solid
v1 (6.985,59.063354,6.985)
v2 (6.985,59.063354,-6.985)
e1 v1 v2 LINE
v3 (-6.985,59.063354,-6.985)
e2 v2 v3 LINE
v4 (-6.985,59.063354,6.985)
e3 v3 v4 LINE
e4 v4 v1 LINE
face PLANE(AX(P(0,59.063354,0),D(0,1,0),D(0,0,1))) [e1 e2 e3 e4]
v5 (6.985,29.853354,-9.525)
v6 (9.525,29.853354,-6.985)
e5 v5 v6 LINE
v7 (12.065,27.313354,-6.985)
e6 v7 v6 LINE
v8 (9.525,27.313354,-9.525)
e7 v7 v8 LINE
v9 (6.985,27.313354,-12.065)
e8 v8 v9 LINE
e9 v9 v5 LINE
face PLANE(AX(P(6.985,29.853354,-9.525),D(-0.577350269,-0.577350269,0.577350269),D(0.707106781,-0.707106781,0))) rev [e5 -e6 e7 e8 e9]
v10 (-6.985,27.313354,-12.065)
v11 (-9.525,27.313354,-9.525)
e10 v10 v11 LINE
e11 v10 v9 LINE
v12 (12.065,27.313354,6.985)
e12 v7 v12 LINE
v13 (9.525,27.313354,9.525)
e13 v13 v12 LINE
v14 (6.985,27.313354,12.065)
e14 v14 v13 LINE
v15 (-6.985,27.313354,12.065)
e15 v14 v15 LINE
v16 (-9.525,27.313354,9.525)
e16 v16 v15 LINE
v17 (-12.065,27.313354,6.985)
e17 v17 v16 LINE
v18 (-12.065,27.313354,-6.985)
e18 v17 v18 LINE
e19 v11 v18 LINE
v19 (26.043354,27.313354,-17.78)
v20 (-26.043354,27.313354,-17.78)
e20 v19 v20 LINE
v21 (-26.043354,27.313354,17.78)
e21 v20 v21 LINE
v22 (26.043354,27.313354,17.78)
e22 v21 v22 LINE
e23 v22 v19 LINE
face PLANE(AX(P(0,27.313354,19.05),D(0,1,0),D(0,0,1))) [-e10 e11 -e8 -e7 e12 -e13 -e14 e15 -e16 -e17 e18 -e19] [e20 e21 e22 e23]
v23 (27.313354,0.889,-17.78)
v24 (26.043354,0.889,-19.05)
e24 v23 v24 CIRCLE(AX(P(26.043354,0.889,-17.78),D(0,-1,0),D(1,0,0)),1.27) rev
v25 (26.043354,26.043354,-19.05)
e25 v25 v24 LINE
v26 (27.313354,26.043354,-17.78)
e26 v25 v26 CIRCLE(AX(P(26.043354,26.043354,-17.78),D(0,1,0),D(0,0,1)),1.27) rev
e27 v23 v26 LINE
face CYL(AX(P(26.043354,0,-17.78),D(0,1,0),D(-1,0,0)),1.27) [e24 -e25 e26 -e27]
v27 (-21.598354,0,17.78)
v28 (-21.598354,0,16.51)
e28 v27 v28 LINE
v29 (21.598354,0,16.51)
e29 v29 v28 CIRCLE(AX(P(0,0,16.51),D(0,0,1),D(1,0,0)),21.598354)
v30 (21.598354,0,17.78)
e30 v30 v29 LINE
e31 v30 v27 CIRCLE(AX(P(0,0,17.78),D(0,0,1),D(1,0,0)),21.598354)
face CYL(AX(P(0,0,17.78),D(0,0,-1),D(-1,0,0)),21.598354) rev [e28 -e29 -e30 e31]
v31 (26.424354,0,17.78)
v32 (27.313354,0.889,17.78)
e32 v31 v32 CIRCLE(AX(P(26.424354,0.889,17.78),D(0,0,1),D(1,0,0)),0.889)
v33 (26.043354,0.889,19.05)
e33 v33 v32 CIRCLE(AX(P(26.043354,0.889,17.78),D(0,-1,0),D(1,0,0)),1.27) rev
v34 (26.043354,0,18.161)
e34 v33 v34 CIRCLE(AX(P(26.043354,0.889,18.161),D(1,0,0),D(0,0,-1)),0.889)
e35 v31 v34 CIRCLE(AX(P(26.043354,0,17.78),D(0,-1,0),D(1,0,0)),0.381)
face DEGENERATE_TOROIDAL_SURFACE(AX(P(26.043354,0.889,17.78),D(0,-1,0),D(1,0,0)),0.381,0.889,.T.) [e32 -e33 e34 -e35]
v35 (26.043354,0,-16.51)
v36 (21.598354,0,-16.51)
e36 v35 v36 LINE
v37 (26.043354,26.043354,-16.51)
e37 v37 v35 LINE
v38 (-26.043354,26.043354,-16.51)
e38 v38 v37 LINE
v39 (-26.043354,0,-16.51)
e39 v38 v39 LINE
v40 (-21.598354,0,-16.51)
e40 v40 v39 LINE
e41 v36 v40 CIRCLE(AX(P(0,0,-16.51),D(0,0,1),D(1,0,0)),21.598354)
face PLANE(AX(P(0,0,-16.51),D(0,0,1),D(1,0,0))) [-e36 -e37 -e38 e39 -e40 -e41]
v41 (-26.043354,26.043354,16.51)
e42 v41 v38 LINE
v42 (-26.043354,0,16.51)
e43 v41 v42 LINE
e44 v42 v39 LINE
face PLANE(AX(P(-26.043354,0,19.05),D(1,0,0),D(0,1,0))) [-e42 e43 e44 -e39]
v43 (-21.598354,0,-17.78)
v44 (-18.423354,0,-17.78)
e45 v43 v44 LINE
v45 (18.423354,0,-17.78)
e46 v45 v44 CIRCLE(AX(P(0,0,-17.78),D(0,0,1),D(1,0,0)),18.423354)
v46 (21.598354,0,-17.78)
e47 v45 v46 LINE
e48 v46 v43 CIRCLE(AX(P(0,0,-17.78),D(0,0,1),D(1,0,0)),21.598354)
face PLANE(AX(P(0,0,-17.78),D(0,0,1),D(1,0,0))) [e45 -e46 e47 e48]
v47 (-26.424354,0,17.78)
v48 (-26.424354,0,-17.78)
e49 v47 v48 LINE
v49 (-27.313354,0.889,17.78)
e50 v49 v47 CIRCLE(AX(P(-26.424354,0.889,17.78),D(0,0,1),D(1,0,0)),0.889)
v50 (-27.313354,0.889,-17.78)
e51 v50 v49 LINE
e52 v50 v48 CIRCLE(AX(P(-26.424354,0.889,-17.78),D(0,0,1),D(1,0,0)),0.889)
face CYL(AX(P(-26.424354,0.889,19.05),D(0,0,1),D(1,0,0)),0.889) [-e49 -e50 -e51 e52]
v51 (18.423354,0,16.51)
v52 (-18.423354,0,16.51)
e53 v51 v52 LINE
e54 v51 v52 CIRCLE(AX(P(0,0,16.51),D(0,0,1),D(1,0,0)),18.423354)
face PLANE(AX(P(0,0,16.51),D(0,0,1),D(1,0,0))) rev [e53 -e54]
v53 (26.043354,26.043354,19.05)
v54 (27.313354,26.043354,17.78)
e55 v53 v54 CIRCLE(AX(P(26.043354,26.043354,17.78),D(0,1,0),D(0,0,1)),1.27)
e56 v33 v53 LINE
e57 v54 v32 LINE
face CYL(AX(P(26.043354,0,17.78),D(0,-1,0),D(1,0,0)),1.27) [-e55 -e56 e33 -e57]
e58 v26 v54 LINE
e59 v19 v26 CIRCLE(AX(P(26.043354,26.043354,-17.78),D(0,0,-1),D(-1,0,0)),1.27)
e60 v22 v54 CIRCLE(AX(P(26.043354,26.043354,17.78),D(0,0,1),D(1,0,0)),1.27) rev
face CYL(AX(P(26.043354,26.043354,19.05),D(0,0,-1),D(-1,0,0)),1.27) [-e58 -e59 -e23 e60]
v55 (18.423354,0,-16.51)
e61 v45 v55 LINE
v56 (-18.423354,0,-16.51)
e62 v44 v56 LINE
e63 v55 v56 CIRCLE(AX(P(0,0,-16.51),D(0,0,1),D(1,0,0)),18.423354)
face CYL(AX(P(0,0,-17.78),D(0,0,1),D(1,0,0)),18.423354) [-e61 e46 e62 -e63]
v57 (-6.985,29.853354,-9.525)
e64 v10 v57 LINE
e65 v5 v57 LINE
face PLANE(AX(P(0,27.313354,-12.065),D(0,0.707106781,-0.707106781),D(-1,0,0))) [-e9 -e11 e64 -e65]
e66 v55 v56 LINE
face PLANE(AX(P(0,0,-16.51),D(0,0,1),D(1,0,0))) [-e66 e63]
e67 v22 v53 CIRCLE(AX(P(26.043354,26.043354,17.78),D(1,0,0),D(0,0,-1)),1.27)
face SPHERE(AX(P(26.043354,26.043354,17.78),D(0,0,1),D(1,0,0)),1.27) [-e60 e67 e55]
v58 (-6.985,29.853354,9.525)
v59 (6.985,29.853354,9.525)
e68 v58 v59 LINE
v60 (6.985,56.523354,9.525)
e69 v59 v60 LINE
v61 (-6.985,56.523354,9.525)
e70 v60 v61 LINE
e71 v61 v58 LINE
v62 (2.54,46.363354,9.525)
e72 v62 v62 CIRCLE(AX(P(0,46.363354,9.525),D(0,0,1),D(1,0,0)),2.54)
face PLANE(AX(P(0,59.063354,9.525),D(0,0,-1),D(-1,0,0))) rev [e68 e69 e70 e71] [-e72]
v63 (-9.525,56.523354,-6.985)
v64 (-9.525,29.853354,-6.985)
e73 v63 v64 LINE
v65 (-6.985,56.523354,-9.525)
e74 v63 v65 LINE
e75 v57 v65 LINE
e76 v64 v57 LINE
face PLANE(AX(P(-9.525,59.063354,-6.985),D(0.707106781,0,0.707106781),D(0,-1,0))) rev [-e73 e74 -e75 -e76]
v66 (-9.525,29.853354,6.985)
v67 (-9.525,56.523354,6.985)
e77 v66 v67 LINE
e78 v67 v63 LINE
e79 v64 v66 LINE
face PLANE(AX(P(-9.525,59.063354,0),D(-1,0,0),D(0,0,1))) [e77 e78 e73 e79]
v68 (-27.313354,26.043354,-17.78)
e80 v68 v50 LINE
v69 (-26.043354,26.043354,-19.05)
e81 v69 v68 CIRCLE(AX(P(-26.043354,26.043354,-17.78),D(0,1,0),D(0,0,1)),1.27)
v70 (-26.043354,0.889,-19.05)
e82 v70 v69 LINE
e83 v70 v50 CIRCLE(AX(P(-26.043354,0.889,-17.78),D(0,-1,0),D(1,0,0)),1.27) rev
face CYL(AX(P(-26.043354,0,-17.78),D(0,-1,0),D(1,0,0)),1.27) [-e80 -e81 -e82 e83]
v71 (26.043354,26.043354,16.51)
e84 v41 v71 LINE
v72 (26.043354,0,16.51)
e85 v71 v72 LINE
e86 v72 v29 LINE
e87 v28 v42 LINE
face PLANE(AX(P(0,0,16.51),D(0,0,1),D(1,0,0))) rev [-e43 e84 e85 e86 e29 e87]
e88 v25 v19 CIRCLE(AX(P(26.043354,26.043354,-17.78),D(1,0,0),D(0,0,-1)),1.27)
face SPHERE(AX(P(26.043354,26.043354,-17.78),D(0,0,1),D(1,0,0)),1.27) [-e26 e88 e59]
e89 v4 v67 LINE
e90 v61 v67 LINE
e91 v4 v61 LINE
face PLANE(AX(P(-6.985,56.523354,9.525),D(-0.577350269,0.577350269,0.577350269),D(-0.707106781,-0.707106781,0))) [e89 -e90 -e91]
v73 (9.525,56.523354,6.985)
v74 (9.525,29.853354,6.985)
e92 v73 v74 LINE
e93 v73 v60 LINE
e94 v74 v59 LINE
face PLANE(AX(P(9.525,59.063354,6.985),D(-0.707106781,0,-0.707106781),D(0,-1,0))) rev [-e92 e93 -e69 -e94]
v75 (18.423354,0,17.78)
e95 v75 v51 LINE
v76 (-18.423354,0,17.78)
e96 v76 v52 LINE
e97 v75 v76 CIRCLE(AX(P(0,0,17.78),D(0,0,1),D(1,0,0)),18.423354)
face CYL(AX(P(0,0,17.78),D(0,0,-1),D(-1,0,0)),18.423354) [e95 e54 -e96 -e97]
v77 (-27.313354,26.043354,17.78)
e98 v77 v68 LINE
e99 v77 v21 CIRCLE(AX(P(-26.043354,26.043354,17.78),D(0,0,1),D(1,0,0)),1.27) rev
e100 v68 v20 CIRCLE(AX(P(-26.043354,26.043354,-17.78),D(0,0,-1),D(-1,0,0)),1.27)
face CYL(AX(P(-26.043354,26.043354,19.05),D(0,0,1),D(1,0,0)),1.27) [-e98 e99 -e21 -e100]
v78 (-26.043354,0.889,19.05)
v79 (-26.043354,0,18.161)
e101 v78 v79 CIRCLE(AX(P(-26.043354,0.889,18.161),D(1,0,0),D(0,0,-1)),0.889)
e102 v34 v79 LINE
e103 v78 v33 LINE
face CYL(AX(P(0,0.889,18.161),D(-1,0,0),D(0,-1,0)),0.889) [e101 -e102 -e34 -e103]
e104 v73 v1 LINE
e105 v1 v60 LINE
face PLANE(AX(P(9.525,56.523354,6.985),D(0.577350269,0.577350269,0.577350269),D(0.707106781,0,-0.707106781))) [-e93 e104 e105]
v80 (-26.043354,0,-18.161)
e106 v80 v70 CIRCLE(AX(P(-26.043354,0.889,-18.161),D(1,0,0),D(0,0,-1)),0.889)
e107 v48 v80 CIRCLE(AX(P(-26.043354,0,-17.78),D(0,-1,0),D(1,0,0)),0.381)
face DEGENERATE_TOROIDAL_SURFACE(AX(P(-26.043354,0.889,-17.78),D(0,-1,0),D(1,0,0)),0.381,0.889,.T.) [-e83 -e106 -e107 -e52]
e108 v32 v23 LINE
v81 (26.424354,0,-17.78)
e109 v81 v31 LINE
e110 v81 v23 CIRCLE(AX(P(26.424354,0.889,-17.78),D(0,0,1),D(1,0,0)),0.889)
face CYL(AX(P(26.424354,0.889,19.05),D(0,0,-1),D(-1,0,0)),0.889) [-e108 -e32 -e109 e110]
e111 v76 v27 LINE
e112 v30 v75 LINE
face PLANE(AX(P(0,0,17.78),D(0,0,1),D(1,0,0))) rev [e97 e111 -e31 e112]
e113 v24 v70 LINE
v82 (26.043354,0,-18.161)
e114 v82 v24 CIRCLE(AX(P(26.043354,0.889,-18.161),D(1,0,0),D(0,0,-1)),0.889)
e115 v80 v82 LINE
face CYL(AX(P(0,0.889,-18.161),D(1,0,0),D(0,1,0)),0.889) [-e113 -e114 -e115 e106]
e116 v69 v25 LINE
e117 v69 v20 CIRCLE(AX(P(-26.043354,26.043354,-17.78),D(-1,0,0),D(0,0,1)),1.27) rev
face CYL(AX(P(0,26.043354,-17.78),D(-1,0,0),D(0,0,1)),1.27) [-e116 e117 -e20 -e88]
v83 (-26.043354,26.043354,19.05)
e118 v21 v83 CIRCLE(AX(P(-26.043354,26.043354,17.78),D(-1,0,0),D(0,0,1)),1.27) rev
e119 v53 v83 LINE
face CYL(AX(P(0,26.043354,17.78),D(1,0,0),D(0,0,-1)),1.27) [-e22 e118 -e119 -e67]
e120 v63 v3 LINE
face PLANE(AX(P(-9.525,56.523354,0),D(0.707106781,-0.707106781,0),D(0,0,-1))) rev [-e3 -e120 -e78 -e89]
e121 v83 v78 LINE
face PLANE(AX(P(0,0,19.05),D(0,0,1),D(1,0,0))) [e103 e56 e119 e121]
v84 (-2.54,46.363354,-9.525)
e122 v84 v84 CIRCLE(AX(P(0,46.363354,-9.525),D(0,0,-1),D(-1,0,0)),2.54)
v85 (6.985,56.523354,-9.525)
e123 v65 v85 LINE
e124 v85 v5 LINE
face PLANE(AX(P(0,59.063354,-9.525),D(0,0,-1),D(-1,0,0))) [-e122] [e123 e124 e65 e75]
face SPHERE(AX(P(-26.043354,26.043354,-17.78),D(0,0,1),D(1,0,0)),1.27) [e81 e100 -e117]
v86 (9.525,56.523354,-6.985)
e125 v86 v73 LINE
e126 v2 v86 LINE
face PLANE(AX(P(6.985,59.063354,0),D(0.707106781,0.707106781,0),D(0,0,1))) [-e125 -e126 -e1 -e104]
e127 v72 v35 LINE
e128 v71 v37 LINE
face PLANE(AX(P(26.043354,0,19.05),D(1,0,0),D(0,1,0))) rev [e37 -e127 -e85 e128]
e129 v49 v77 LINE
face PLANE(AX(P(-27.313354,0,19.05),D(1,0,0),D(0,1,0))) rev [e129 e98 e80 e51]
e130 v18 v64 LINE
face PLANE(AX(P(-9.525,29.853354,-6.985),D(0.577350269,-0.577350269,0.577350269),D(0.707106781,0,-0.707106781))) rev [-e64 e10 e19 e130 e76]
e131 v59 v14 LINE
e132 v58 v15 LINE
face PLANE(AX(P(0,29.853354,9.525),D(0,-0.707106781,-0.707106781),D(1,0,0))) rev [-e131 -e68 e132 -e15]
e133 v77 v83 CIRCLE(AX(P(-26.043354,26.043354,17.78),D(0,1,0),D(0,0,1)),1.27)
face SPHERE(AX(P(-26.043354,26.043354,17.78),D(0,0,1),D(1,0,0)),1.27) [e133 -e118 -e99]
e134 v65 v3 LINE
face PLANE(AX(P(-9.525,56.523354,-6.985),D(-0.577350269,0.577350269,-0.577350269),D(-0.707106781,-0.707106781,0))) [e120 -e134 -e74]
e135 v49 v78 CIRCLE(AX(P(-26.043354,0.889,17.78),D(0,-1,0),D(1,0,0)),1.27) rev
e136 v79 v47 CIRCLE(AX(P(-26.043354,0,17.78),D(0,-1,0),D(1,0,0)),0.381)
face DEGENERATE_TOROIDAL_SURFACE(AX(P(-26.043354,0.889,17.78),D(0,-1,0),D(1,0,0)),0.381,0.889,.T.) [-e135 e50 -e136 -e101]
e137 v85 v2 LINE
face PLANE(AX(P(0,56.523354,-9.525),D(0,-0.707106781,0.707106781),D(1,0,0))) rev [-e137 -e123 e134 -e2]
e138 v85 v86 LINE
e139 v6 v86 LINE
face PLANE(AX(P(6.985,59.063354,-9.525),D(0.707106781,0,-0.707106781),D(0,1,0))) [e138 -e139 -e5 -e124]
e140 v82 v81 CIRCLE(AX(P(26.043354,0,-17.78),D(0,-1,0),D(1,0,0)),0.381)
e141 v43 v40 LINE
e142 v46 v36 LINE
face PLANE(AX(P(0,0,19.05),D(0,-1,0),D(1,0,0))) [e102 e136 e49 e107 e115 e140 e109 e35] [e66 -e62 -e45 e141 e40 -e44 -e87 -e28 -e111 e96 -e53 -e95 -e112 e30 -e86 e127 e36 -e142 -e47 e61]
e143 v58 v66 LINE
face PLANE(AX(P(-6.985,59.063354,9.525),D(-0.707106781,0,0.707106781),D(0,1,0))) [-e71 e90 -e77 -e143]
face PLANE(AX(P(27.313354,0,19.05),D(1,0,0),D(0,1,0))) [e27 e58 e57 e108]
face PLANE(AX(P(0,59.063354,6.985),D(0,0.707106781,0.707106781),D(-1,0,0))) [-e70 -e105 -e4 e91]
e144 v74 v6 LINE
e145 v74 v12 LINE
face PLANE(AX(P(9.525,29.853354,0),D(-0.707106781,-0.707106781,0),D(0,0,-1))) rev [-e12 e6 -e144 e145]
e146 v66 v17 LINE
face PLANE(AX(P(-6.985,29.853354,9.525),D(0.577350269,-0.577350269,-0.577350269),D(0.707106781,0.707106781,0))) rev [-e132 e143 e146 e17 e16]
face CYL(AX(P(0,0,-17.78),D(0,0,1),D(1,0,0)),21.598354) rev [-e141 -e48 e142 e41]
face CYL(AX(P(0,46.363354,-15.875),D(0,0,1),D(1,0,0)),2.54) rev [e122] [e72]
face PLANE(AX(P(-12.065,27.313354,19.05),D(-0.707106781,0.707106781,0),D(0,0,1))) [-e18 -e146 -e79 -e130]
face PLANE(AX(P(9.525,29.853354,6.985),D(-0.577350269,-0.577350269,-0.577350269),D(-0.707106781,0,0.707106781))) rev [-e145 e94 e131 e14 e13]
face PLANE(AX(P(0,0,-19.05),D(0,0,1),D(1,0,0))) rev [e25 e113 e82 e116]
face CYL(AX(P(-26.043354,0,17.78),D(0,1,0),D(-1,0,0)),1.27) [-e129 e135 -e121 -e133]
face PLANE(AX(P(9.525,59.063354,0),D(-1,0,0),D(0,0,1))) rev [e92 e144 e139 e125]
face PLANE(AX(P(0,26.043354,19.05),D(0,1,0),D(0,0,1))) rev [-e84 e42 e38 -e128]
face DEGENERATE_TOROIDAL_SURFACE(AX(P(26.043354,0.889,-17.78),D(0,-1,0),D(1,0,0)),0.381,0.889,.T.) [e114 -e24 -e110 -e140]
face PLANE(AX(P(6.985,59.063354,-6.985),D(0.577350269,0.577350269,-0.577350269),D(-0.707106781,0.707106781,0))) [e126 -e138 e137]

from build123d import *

# Parameters (mm, degrees)
MAIN_BODY_EXTRUDE_DEPTH        = 19.05
HINGE_START                    = -26.043353817
HINGE_SHELL_OUTLINE_W          = 26.043353817
HINGE_SHELL_OUTLINE_H          = 33.02
HINGE_SHELL_DEPTH              = 52.086707634
GROOVE_START                   = -16.51
GROOVE_1_DEPTH                 = 1.27
GROOVE_START_2                 = 17.78
GROOVE_2_DEPTH                 = 1.27
SKETCH5_W                      = 19.05
SKETCH5_H                      = 19.05
TIBIA_CONNECTION_EXTRUDE_DEPTH = 31.75
SKETCH6_R                      = 2.54
PINHOLE_CUT_DEPTH              = 25.4
FILLET1_R                      = 1.27
CHAMFER1_SIZE                  = 2.54
FILLET2_R                      = 0.889


# Read off the part's stored shape, not the designer's step: Hinge Shell
with BuildPart() as part:
    # Sketch1 → Main Body Extrude (new, symmetric)
    with BuildSketch(Plane.XY):
        with BuildLine():
            Line((18.423353817, 0), (-18.423353817, 0))
            ThreePointArc((-18.423353817, 0), (0, 18.423353817), (18.423353817, 0))
        make_face()
        with BuildLine():
            Line((18.423353817, 0), (21.598353817, 0))
            ThreePointArc((21.598353817, 0), (0, 21.598353817), (-21.598353817, 0))
            Line((-21.598353817, 0), (-18.423353817, 0))
            ThreePointArc((-18.423353817, 0), (0, 18.423353817), (18.423353817, 0))
        make_face()
        with BuildLine():
            Line((24.138353817, 0), (21.598353817, 0))
            ThreePointArc((21.598353817, 0), (0, 21.598353817), (-21.598353817, 0))
            Line((-21.598353817, 0), (-24.138353817, 0))
            ThreePointArc((-24.138353817, 0), (0, 24.138353817), (24.138353817, 0))
        make_face()
        with BuildLine():
            ThreePointArc((24.138353817, 0), (0, 24.138353817), (-24.138353817, 0))
            Line((-24.138353817, 0), (-24.773353817, 0))
            ThreePointArc((-24.773353817, 0), (0, 24.773353817), (24.773353817, 0))
            Line((24.773353817, 0), (24.138353817, 0))
        make_face()
        with BuildLine():
            Line((27.313353817, 0), (24.773353817, 0))
            ThreePointArc((24.773353817, 0), (0, 24.773353817), (-24.773353817, 0))
            Line((-24.773353817, 0), (-27.313353817, 0))
            ThreePointArc((-27.313353817, 0), (0, 27.313353817), (27.313353817, 0))
        make_face()
        with BuildLine():
            Line((-27.313353817, 27.313353817), (-27.313353817, 0))
            ThreePointArc((-27.313353817, 0), (-19.313457701, 19.313457701), (0, 27.313353817))
            Line((0, 27.313353817), (-27.313353817, 27.313353817))
        make_face()
        with BuildLine():
            Line((27.313353817, 27.313353817), (0, 27.313353817))
            ThreePointArc((0, 27.313353817), (19.313457701, 19.313457701), (27.313353817, 0))
            Line((27.313353817, 0), (27.313353817, 27.313353817))
        make_face()
    extrude(amount=MAIN_BODY_EXTRUDE_DEPTH, both=True)

    # Hinge Shell outline → Hinge Shell (cut)
    with BuildSketch(Plane.YZ.offset(HINGE_START)):
        with Locations((13.021676908, 0)):
            Rectangle(HINGE_SHELL_OUTLINE_W, HINGE_SHELL_OUTLINE_H)
    extrude(amount=HINGE_SHELL_DEPTH, mode=Mode.SUBTRACT)

    # Sketch1<13> → Groove 1 (cut)
    with BuildSketch(Plane.XY.offset(GROOVE_START)):
        with BuildLine():
            Line((18.423353817, 0), (21.598353817, 0))
            ThreePointArc((21.598353817, 0), (0, 21.598353817), (-21.598353817, 0))
            Line((-21.598353817, 0), (-18.423353817, 0))
            ThreePointArc((-18.423353817, 0), (0, 18.423353817), (18.423353817, 0))
        make_face()
    extrude(amount=-GROOVE_1_DEPTH, mode=Mode.SUBTRACT)

    # Sketch1<14> → Groove 2 (cut)
    with BuildSketch(Plane.XY.offset(GROOVE_START_2)):
        with BuildLine():
            Line((18.423353817, 0), (21.598353817, 0))
            ThreePointArc((21.598353817, 0), (0, 21.598353817), (-21.598353817, 0))
            Line((-21.598353817, 0), (-18.423353817, 0))
            ThreePointArc((-18.423353817, 0), (0, 18.423353817), (18.423353817, 0))
        make_face()
    extrude(amount=-GROOVE_2_DEPTH, mode=Mode.SUBTRACT)

    # Sketch5 → Tibia Connection Extrude (add)
    with BuildSketch(Plane(origin=(0, 27.313353817, 0), x_dir=(1, 0, 0), z_dir=(0, 1, 0))):
        Rectangle(SKETCH5_W, SKETCH5_H)
    extrude(amount=TIBIA_CONNECTION_EXTRUDE_DEPTH)

    # Sketch6 → Pinhole Cut (cut)
    with BuildSketch(Plane.XY.offset(9.525)):
        with Locations((0, 46.363353817)):
            Circle(SKETCH6_R)
    extrude(amount=-PINHOLE_CUT_DEPTH, mode=Mode.SUBTRACT)

    # Fillet1
    fillet1_edges = [part.edges().sort_by_distance(p)[0] for p in [
        (-27.313353817, 27.313353817, 0),
        (27.313353817, 27.313353817, 0),
        (27.313353817, 13.656676909, 19.05),
        (0, 27.313353817, 19.05),
        (-27.313353817, 13.656676909, 19.05),
        (-27.313353817, 13.656676909, -19.05),
        (0, 27.313353817, -19.05),
        (27.313353817, 13.656676909, -19.05),
    ]]
    fillet(fillet1_edges, radius=FILLET1_R)

    # Chamfer1
    chamfer1_edges = [part.edges().sort_by_distance(p)[0] for p in [
        (0, 27.313353817, 9.525),
        (-9.525, 43.188353817, 9.525),
        (9.525, 27.313353817, 0),
        (9.525, 43.188353817, 9.525),
        (0, 59.063353817, -9.525),
        (9.525, 43.188353817, -9.525),
        (-9.525, 59.063353817, 0),
        (-9.525, 43.188353817, -9.525),
        (0, 59.063353817, 9.525),
        (9.525, 59.063353817, 0),
        (-9.525, 27.313353817, 0),
        (0, 27.313353817, -9.525),
    ]]
    chamfer(chamfer1_edges, length=CHAMFER1_SIZE)

    # Fillet2
    fillet2_edges = [part.edges().sort_by_distance(p)[0] for p in [
        (26.941379429, 0, -18.678025612),
        (0, 0, -19.05),
        (27.313353817, 0, 0),
        (0, 0, 19.05),
        (-27.313353817, 0, 0),
        (26.941379429, 0, 18.678025612),
        (-26.941379429, 0, 18.678025612),
        (-26.941379429, 0, -18.678025612),
    ]]
    fillet(fillet2_edges, radius=FILLET2_R)


solid = part.part
